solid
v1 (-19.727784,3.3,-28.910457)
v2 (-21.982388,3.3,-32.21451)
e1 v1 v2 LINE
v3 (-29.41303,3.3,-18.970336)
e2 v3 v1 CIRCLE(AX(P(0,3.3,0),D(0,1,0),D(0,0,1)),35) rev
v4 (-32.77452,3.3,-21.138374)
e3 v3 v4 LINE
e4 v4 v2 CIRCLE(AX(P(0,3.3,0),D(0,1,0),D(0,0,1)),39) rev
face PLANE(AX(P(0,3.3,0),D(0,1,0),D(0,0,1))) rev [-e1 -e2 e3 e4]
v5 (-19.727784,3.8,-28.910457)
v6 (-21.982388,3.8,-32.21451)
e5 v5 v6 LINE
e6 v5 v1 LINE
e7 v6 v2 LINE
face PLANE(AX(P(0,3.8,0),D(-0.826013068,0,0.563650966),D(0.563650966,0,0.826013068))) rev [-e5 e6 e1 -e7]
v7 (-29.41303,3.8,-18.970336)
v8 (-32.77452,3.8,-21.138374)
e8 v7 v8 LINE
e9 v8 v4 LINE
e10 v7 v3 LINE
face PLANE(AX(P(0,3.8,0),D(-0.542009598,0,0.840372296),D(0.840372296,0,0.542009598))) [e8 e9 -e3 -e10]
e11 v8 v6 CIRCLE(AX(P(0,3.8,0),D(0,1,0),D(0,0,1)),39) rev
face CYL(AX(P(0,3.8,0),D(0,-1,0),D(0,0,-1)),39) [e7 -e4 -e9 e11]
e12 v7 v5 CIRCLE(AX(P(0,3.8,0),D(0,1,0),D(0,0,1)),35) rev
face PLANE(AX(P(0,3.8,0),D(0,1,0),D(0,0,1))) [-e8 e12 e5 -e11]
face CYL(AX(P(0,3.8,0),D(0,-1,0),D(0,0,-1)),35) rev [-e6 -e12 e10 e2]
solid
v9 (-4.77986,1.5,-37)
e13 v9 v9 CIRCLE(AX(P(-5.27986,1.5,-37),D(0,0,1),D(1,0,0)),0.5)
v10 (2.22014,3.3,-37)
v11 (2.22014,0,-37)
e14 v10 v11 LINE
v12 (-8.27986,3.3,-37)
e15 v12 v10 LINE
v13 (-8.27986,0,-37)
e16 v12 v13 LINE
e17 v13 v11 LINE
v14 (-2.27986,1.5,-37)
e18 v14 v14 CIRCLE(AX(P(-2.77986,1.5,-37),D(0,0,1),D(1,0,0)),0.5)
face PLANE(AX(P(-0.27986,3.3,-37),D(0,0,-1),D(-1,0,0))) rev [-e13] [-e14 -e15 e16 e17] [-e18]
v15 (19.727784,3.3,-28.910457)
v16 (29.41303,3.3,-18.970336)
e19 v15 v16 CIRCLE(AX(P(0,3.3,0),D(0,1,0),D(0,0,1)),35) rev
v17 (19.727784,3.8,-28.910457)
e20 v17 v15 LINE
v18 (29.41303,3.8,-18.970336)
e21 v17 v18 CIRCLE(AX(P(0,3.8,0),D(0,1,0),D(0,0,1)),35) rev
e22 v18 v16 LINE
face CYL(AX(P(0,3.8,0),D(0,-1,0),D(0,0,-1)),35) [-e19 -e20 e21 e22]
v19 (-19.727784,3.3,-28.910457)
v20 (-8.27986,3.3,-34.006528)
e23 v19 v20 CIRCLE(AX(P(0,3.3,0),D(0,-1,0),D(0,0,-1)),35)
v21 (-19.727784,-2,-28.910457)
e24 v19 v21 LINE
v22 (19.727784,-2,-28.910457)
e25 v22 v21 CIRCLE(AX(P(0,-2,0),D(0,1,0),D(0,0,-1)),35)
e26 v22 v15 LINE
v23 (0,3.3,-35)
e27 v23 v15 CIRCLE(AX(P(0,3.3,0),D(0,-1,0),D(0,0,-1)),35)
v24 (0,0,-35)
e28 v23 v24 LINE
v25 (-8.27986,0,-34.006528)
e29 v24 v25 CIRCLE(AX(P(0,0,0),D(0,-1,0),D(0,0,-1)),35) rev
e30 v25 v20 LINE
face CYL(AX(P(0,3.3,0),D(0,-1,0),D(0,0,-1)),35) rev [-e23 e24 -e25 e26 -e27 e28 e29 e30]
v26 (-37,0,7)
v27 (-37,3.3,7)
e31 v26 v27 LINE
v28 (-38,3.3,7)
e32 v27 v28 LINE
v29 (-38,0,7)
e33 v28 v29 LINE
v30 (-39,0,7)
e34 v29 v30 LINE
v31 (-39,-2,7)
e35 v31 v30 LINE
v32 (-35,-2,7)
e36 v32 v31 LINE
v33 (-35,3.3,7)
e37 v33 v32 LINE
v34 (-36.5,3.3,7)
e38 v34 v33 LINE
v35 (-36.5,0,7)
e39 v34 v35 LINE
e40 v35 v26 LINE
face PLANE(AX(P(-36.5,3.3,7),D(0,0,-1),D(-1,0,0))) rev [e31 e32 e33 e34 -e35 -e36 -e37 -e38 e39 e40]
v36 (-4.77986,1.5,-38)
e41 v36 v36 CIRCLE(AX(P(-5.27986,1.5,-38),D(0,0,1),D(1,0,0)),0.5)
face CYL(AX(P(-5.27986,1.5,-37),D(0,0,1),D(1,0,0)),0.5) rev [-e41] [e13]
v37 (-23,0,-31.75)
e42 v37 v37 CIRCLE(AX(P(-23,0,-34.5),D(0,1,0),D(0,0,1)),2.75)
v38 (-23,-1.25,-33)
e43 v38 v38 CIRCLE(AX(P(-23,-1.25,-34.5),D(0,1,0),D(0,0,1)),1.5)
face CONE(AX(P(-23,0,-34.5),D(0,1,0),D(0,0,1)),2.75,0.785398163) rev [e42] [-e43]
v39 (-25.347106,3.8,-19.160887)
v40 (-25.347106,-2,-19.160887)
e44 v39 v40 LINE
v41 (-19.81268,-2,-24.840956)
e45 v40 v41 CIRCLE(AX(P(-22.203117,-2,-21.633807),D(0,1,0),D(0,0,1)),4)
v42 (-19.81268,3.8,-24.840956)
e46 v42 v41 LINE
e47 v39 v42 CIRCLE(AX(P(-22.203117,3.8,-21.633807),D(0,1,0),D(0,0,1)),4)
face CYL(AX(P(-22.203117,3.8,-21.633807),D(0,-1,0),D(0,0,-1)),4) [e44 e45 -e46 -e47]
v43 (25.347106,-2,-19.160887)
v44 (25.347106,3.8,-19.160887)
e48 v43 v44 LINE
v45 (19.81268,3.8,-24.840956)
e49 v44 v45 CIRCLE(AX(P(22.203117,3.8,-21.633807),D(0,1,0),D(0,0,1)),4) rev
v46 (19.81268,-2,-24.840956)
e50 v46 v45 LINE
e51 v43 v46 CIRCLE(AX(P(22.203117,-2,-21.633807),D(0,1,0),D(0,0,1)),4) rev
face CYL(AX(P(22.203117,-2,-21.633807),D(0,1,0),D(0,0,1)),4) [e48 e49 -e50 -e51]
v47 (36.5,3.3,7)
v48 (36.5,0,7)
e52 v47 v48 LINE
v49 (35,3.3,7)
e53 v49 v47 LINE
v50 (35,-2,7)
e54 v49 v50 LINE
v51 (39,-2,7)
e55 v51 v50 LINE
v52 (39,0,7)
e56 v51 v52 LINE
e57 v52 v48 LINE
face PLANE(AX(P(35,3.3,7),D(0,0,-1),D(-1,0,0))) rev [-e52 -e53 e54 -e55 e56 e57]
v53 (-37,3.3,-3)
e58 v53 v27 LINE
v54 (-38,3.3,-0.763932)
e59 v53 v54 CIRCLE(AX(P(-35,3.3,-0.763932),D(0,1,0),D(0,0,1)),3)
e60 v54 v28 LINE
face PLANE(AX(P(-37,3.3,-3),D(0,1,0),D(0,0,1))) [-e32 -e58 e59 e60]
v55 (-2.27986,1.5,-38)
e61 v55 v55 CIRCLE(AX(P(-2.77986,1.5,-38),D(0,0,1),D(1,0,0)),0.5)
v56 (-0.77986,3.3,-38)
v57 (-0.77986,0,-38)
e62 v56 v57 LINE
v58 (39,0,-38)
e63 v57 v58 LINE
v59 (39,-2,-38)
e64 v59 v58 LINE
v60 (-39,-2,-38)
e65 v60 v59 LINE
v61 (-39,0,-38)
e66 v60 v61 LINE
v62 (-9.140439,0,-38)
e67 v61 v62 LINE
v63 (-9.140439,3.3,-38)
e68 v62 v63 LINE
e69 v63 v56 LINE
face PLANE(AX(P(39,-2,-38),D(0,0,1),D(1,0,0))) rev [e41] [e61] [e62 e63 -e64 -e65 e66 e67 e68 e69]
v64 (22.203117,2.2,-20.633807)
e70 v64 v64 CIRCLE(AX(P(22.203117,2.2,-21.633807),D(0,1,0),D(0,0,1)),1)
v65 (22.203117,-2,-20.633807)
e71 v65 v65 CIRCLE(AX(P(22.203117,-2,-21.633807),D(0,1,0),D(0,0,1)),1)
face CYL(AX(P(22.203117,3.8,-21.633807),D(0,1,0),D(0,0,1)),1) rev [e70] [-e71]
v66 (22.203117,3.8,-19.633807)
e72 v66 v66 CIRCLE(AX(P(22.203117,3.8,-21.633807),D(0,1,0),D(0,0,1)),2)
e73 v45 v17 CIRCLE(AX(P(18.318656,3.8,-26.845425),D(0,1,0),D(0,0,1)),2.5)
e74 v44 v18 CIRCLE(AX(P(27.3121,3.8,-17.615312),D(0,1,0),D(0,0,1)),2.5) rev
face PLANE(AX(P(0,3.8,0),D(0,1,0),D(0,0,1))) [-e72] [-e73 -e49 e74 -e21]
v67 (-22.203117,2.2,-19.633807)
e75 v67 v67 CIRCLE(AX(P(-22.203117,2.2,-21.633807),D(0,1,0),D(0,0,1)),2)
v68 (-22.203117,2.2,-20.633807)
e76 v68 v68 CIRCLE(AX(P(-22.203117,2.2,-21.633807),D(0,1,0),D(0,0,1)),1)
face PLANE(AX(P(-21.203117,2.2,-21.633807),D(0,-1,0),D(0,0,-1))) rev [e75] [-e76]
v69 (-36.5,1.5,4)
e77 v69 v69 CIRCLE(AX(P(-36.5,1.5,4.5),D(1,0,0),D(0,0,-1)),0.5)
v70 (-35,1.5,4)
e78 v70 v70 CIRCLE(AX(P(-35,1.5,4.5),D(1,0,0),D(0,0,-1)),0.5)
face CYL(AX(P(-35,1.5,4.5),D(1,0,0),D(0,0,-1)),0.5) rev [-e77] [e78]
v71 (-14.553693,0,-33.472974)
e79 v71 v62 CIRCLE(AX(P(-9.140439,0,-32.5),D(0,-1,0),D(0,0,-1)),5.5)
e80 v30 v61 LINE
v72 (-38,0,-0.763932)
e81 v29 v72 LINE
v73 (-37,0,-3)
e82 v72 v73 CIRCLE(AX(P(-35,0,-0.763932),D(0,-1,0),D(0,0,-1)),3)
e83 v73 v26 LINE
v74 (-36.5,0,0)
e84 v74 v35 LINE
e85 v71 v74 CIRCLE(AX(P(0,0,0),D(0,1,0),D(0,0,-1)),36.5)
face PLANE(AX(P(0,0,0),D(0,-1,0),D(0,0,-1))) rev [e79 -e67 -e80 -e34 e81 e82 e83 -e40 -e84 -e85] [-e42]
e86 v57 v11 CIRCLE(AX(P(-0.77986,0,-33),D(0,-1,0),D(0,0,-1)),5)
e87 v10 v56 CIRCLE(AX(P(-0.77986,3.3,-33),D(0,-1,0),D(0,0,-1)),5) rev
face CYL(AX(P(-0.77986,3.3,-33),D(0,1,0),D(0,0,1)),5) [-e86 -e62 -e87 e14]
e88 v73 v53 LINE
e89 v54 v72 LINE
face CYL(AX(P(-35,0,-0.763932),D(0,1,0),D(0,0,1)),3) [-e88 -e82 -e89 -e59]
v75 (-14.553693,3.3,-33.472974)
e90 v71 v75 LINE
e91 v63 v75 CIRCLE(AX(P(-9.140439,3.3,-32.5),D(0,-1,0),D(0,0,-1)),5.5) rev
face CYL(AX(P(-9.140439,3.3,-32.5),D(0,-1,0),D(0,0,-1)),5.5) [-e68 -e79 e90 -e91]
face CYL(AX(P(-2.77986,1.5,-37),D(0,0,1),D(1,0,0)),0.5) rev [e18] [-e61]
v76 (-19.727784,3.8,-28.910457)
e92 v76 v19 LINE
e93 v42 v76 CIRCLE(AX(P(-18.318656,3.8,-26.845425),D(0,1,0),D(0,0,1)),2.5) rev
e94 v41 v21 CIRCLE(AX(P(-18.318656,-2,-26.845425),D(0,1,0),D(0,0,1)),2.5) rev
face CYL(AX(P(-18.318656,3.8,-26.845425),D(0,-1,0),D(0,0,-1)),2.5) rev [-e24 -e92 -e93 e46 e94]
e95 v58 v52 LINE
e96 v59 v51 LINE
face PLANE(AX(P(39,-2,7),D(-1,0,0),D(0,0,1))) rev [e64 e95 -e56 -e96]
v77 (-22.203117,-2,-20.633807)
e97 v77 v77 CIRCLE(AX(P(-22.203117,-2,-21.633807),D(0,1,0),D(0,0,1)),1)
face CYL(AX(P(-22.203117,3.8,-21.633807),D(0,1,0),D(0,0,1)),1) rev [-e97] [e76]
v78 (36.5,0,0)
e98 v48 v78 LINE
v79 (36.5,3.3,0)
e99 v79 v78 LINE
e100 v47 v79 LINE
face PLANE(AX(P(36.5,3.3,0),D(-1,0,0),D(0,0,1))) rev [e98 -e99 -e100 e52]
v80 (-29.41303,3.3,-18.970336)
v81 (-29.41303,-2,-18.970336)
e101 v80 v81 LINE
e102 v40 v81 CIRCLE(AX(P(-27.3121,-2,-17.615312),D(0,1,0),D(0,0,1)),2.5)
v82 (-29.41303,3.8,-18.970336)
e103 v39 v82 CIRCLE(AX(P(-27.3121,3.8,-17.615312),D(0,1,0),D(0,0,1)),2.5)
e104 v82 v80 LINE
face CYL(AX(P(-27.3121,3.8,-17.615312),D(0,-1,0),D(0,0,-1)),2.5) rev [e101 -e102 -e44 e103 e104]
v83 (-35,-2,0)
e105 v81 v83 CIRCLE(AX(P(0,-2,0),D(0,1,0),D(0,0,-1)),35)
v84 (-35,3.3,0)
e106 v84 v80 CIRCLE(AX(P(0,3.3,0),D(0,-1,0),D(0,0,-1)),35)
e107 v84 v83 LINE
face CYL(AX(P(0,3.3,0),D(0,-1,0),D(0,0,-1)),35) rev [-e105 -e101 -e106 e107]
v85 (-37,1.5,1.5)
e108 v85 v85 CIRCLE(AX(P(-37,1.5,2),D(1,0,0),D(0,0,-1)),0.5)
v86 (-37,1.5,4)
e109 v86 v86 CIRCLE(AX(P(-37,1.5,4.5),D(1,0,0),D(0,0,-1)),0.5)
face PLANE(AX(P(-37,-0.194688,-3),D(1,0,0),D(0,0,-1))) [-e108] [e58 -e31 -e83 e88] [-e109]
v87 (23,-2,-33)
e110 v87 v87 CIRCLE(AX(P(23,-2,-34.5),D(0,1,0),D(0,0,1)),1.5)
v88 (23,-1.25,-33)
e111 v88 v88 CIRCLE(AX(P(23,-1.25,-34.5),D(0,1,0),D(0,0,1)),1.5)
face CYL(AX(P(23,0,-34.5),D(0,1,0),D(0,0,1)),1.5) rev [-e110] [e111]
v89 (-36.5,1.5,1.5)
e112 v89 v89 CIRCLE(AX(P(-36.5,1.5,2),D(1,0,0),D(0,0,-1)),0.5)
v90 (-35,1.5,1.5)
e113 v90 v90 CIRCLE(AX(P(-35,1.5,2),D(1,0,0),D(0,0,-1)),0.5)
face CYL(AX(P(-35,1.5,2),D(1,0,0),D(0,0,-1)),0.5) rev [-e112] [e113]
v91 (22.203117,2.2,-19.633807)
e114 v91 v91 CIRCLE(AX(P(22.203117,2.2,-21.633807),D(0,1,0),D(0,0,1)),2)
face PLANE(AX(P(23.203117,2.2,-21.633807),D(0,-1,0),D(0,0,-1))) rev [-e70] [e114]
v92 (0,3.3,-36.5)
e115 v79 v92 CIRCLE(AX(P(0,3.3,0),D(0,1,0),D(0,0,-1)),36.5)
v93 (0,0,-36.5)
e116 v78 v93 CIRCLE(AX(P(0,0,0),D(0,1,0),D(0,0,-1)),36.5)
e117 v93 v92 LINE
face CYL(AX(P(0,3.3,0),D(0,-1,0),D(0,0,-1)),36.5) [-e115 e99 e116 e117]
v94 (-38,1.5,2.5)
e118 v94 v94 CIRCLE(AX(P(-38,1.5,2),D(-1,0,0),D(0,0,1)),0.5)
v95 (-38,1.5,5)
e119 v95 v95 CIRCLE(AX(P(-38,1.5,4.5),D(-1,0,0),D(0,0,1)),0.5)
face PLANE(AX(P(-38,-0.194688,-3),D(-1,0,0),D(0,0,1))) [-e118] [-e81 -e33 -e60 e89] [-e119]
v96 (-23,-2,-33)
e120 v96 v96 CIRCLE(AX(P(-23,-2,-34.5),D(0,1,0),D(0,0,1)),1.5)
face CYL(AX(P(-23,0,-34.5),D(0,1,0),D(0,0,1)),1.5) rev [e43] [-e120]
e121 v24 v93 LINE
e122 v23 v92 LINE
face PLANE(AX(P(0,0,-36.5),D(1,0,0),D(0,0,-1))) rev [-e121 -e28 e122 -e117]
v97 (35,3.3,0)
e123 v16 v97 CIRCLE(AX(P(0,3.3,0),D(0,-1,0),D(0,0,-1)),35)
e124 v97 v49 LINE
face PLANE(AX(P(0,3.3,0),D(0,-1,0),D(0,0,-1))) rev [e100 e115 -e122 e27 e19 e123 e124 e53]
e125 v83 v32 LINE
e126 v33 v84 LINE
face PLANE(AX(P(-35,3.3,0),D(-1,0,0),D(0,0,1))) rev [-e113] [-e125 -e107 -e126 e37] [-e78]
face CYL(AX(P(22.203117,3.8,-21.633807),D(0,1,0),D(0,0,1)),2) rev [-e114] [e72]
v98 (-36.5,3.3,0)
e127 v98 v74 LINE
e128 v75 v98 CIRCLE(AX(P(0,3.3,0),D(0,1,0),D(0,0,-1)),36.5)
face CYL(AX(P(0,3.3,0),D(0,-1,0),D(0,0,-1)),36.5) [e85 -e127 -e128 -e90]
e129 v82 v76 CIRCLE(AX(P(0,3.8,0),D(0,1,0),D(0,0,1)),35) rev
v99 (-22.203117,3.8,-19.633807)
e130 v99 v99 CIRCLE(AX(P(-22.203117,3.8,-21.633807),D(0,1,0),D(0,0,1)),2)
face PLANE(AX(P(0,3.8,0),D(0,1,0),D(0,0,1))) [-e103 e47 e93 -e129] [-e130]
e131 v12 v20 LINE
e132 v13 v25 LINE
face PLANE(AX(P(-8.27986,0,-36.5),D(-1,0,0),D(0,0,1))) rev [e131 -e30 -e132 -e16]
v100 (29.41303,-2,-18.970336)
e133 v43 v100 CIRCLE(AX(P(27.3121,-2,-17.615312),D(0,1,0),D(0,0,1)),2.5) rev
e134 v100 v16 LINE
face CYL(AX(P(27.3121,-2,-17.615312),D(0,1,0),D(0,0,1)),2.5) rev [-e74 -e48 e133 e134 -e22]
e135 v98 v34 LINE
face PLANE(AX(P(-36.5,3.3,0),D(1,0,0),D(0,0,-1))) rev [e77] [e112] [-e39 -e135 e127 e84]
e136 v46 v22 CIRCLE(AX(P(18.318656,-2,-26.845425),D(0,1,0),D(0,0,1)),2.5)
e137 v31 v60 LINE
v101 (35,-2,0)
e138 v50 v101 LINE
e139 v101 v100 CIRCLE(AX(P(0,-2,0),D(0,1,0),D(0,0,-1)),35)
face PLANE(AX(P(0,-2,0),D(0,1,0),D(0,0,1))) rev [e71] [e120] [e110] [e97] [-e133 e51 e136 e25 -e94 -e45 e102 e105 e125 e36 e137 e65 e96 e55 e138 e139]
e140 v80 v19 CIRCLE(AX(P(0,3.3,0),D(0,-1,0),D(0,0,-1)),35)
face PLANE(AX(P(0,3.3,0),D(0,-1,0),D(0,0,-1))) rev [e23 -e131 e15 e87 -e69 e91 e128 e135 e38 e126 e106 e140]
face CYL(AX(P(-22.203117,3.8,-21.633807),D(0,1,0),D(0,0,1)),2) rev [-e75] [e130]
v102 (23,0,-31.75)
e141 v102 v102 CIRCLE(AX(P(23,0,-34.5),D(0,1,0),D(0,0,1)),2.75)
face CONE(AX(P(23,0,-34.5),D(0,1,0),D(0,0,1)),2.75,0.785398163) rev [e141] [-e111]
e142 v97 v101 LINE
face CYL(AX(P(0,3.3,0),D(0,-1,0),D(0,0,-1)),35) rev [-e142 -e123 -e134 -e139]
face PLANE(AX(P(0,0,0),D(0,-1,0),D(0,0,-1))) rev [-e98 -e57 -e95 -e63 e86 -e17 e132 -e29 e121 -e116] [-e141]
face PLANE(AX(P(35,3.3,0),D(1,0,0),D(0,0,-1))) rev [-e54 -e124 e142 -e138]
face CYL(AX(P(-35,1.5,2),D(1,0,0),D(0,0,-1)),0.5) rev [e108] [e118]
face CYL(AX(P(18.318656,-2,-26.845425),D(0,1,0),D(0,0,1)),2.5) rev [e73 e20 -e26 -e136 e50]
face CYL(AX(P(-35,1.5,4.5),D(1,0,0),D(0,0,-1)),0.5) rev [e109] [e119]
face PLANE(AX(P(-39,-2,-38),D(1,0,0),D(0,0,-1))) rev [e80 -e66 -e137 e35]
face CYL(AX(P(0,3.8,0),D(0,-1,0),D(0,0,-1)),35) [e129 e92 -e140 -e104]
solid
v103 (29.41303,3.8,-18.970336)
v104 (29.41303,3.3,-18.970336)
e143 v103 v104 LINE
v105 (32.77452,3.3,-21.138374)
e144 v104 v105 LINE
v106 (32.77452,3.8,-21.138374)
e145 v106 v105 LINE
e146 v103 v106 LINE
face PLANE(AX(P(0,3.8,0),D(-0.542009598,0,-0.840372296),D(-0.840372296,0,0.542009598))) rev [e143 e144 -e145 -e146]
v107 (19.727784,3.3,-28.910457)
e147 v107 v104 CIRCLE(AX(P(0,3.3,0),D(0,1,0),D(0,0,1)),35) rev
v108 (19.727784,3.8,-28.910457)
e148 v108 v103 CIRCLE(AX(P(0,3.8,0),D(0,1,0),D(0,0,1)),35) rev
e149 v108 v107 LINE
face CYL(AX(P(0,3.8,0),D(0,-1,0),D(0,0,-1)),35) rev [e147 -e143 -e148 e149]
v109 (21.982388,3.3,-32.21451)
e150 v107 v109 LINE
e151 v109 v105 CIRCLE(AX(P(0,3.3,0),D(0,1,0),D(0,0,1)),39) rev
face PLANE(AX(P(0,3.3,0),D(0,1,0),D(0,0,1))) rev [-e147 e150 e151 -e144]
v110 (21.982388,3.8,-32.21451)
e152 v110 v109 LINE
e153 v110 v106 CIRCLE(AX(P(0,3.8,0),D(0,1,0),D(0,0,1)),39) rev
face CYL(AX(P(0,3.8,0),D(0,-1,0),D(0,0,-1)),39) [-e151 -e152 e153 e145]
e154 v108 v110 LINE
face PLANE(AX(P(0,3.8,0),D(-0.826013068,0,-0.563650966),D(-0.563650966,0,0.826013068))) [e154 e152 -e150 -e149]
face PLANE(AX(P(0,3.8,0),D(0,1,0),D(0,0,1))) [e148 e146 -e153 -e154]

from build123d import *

# Parameters (mm, degrees)
BOSS_EXTRUDE1_DEPTH                          = 3.3
BOSS_EXTRUDE2_DEPTH                          = 2
BOSS_EXTRUDE3_DEPTH                          = 0.5
BOSS_EXTRUDE3_DEPTH_BACK                     = 5.3
BOSS_EXTRUDE4_DEPTH                          = 0.5
CBORE_FOR_M2_PAN_HEAD_SCREW2_AT_2_COUNT      = 2
CBORE_FOR_M2_PAN_HEAD_SCREW2_AT_2_PITCH      = 44.406234465
SKETCH13_W                                   = 1
SKETCH13_H                                   = 3.494688162
BOSS_EXTRUDE5_DEPTH                          = 10
FILLET1_R                                    = 3
SKETCH15_W                                   = 8.279859514
SKETCH15_H                                   = 8.940793452
CUT_EXTRUDE2_DEPTH                           = 3.3
SKETCH19_W                                   = 0.5
SKETCH19_H                                   = 5
F_1_0_1_DIAMETER_HOLE2_AT_2_COUNT            = 2
F_1_0_1_DIAMETER_HOLE2_AT_2_PITCH            = 2.5
BOSS_EXTRUDE6_DEPTH                          = 3.3
FILLET2_R                                    = 5.5
CSK_FOR_M3_COUNTERSUNK_FLAT_HEAD_SCR_2_COUNT = 2
CSK_FOR_M3_COUNTERSUNK_FLAT_HEAD_SCR_2_PITCH = 46
FILLET3_R                                    = 5
SKETCH24_W                                   = 0.5
SKETCH24_H                                   = 1
F_1_0_1_DIAMETER_HOLE3_AT_2_COUNT            = 2
F_1_0_1_DIAMETER_HOLE3_AT_2_PITCH            = 2.5


with BuildPart() as part:
    # Sketch1 → Boss-Extrude1 (new body)
    with BuildSketch(Plane(origin=(0, 0, 0), x_dir=(1, 0, 0), z_dir=(0, 1, 0))):
        with BuildLine():
            Line((36.5, 0), (36.5, -7))
            Line((36.5, -7), (35, -7))
            Line((35, -7), (35, 0))
            ThreePointArc((35, 0), (0, 35), (-35, 0))
            Line((-35, 0), (-35, -7))
            Line((-35, -7), (-36.5, -7))
            Line((-36.5, -7), (-36.5, 0))
            ThreePointArc((-36.5, 0), (0, 36.5), (36.5, 0))
        make_face()
    extrude(amount=BOSS_EXTRUDE1_DEPTH)



with BuildPart() as body_2:
    # Sketch2 → Boss-Extrude2 (new body)
    with BuildSketch(Plane.XZ):
        with BuildLine():
            Line((-35, 7), (-39, 7))
            Line((-39, 7), (-39, -38))
            Line((-39, -38), (39, -38))
            Line((39, -38), (39, 7))
            Line((39, 7), (35, 7))
            Line((35, 7), (35, 0))
            ThreePointArc((35, 0), (0, -35), (-35, 0))
            Line((-35, 0), (-35, 7))
        make_face()
    extrude(amount=BOSS_EXTRUDE2_DEPTH)


with BuildPart() as part_1:
    add(part.part)

    add(body_2.part)  # Boss-Extrude3 merges body 2
    # Sketch3 → Boss-Extrude3 (add, two sides: drawn at the far end of the back side and taken through both)
    with BuildSketch(Plane(origin=(0, 3.3, 0), x_dir=(1, 0, 0), z_dir=(0, 1, 0)).offset(-BOSS_EXTRUDE3_DEPTH_BACK)):
        with BuildLine():
            ThreePointArc((-29.413030363, 18.970335918), (-27.429134486, 20.11257099), (-25.347106396, 19.160886774))
            ThreePointArc((-25.347106396, 19.160886774), (-19.33819888, 18.842347627), (-19.812679795, 24.840956181))
            ThreePointArc((-19.812679795, 24.840956181), (-20.81811257, 26.897567167), (-19.727783811, 28.91045738))
            ThreePointArc((-19.727783811, 28.91045738), (-25.068035585, 24.425265442), (-29.413030363, 18.970335918))
        make_face()
        with BuildLine():
            ThreePointArc((29.413030363, 18.970335918), (25.068035585, 24.425265442), (19.727783811, 28.91045738))
            ThreePointArc((19.727783811, 28.91045738), (20.81811257, 26.897567167), (19.812679795, 24.840956181))
            ThreePointArc((19.812679795, 24.840956181), (19.33819888, 18.842347627), (25.347106396, 19.160886774))
            ThreePointArc((25.347106396, 19.160886774), (27.429134486, 20.11257099), (29.413030363, 18.970335918))
        make_face()
    extrude(amount=BOSS_EXTRUDE3_DEPTH + BOSS_EXTRUDE3_DEPTH_BACK)

    # Sketch11 → CBORE for M2 Pan Head Screw2 (revolve, cut)
    with BuildSketch(Plane(origin=(-22.203117232, 3.8, -21.633806534), x_dir=(0, 0, 1), z_dir=(1, 0, 0))):
        Polygon((0, 0), (0, 30.600860619), (1, 30), (1, 1.6), (2, 1.6), (2, 0), align=None)
    cbore_for_m2_pan_head_screw2 = revolve(axis=Axis((-22.203117232, 10.15, -21.633806534), (0, -1, 0)), mode=Mode.SUBTRACT)

    # CBORE for M2 Pan Head Screw2 at 2: CBORE for M2 Pan Head Screw2 ×2
    with Locations(*[(i * CBORE_FOR_M2_PAN_HEAD_SCREW2_AT_2_PITCH, 0, 0) for i in range(1, CBORE_FOR_M2_PAN_HEAD_SCREW2_AT_2_COUNT)]):
        add(cbore_for_m2_pan_head_screw2, mode=Mode.SUBTRACT)

    # Sketch13 → Boss-Extrude5 (add)
    with BuildSketch(Plane.XY.offset(7)):
        with Locations((-37.5, 1.552655919)):
            Rectangle(SKETCH13_W, SKETCH13_H)
    extrude(amount=-BOSS_EXTRUDE5_DEPTH)

    # Fillet1
    # the kernel refuses this fillet: 3 mm, written as the material it takes off along each edge
    with BuildSketch(Plane(origin=(-38, 0, -3), x_dir=(0, 0, 1), z_dir=(0, 1, 0))) as fillet1_piece_1:
        with BuildLine():
            CenterArc((2.236067977, 3), FILLET1_R, 221.810314896, 48.189685104)
            Line((0, 1), (0, 0))
            Line((0, 0), (2.236067977, 0))
        make_face()
    extrude(amount=8.890169944, mode=Mode.SUBTRACT)

    # Sketch15 → Cut-Extrude2 (cut)
    with BuildSketch(Plane(origin=(0, 3.3, 0), x_dir=(1, 0, 0), z_dir=(0, 1, 0))):
        with Locations((-4.139929757, 32.029603274)):
            Rectangle(SKETCH15_W, SKETCH15_H)
    extrude(amount=-CUT_EXTRUDE2_DEPTH, mode=Mode.SUBTRACT)

    # Sketch19 → Ø1.0 (1) Diameter Hole2 (revolve, cut)
    with BuildSketch(Plane(origin=(-35, 1.5, 4.5), x_dir=(0, 0, -1), z_dir=(0, 1, 0))):
        with Locations((0.25, 2.5)):
            Rectangle(SKETCH19_W, SKETCH19_H)
    f_1_0_1_diameter_hole2 = revolve(axis=Axis((-28.65, 1.5, 4.5), (-1, 0, 0)), mode=Mode.SUBTRACT)

    # Ø1.0 (1) Diameter Hole2 at 2: Ø1.0 (1) Diameter Hole2 ×2
    with Locations(*[(0, 0, -i * F_1_0_1_DIAMETER_HOLE2_AT_2_PITCH) for i in range(1, F_1_0_1_DIAMETER_HOLE2_AT_2_COUNT)]):
        add(f_1_0_1_diameter_hole2, mode=Mode.SUBTRACT)

    # Sketch21 → Boss-Extrude6 (add)
    with BuildSketch(Plane(origin=(0, 0, 0), x_dir=(1, 0, 0), z_dir=(0, 1, 0))):
        Polygon((-0.279859514, 37), (2.220140486, 37), (2.220140486, 38), (-14.553693159, 38), (-14.553693159, 32.511000179), (-8.279859514, 34.006527703), (-8.279859514, 37), align=None)
    extrude(amount=BOSS_EXTRUDE6_DEPTH)

    # Fillet2
    # the kernel refuses this fillet: 5.5 mm, written as the material it takes off along each edge
    with BuildSketch(Plane(origin=(-14.553693159, 0, -38), x_dir=(0, 0, 1), z_dir=(0, 1, 0))) as fillet2_piece_1:
        with BuildLine():
            CenterArc((5.5, 5.413254179), FILLET2_R, 180, 79.810496336)
            Line((0, 5.413254179), (0, 0))
            Line((0, 0), (4.527025596, 0))
        make_face()
    extrude(amount=16.833135448, mode=Mode.SUBTRACT)

    # Sketch22 → CSK for M3 Countersunk Flat Head Screw1 (revolve, cut)
    with BuildSketch(Plane(origin=(-23, 0, -34.5), x_dir=(0, 0, 1), z_dir=(1, 0, 0))):
        Polygon((0, 0), (0, 2.001), (1.5, 2.001), (1.5, 1.25), (2.75, 0), align=None)
    csk_for_m3_countersunk_flat_head_screw1 = revolve(axis=Axis((-23, 6.35, -34.5), (0, -1, 0)), mode=Mode.SUBTRACT)

    # CSK for M3 Countersunk Flat Head Scr 2: CSK for M3 Countersunk Flat Head Screw1 ×2
    with Locations(*[(i * CSK_FOR_M3_COUNTERSUNK_FLAT_HEAD_SCR_2_PITCH, 0, 0) for i in range(1, CSK_FOR_M3_COUNTERSUNK_FLAT_HEAD_SCR_2_COUNT)]):
        add(csk_for_m3_countersunk_flat_head_screw1, mode=Mode.SUBTRACT)

    # Fillet3
    # the kernel refuses this fillet: 5 mm, written as the material it takes off along each edge
    with BuildSketch(Plane(origin=(2.220140486, 0, -38), x_dir=(0, 0, 1), z_dir=(0, 1, 0))) as fillet3_piece_1:
        with BuildLine():
            CenterArc((5, -3), FILLET3_R, 143.130102354, 36.869897646)
            Line((0, -3), (0, 0))
            Line((0, 0), (1, 0))
        make_face()
    extrude(amount=10.8, mode=Mode.SUBTRACT)

    # Sketch24 → Ø1.0 (1) Diameter Hole3 (revolve, cut)
    with BuildSketch(Plane(origin=(-5.279859514, 1.5, -37), x_dir=(0, -1, 0), z_dir=(1, 0, 0))):
        with Locations((0.25, 0.5)):
            Rectangle(SKETCH24_W, SKETCH24_H)
    f_1_0_1_diameter_hole3 = revolve(axis=Axis((-5.279859514, 1.5, -30.65), (0, 0, -1)), mode=Mode.SUBTRACT)

    # Ø1.0 (1) Diameter Hole3 at 2: Ø1.0 (1) Diameter Hole3 ×2
    with Locations(*[(i * F_1_0_1_DIAMETER_HOLE3_AT_2_PITCH, 0, 0) for i in range(1, F_1_0_1_DIAMETER_HOLE3_AT_2_COUNT)]):
        add(f_1_0_1_diameter_hole3, mode=Mode.SUBTRACT)


with BuildPart() as body_2_2:
    # Sketch9 → Boss-Extrude4 (new body)
    with BuildSketch(Plane(origin=(0, 3.3, 0), x_dir=(1, 0, 0), z_dir=(0, 1, 0))):
        with BuildLine():
            Line((-32.774519548, 21.138374309), (-30.673588807, 19.783350315))
            ThreePointArc((-30.673588807, 19.783350315), (-26.142379967, 25.472062532), (-20.57326026, 30.149476982))
            Line((-20.57326026, 30.149476982), (-21.982387675, 32.214509652))
            ThreePointArc((-21.982387675, 32.214509652), (-27.932953938, 27.21672435), (-32.774519548, 21.138374309))
        make_face()
        with BuildLine():
            Line((-30.673588807, 19.783350315), (-29.413030363, 18.970335918))
            ThreePointArc((-29.413030363, 18.970335918), (-25.068035585, 24.425265442), (-19.727783811, 28.91045738))
            Line((-19.727783811, 28.91045738), (-20.57326026, 30.149476982))
            ThreePointArc((-20.57326026, 30.149476982), (-26.142379967, 25.472062532), (-30.673588807, 19.783350315))
        make_face()
        with BuildLine():
            ThreePointArc((30.673588807, 19.783350315), (26.142379967, 25.472062532), (20.57326026, 30.149476982))
            Line((20.57326026, 30.149476982), (19.727783811, 28.91045738))
            ThreePointArc((19.727783811, 28.91045738), (25.068035585, 24.425265442), (29.413030363, 18.970335918))
            Line((29.413030363, 18.970335918), (30.673588807, 19.783350315))
        make_face()
        with BuildLine():
            Line((21.982387675, 32.214509652), (20.57326026, 30.149476982))
            ThreePointArc((20.57326026, 30.149476982), (26.142379967, 25.472062532), (30.673588807, 19.783350315))
            Line((30.673588807, 19.783350315), (32.774519548, 21.138374309))
            ThreePointArc((32.774519548, 21.138374309), (27.932953938, 27.21672435), (21.982387675, 32.214509652))
        make_face()
    extrude(amount=BOSS_EXTRUDE4_DEPTH)


solid = Compound([part_1.part, body_2_2.part])
